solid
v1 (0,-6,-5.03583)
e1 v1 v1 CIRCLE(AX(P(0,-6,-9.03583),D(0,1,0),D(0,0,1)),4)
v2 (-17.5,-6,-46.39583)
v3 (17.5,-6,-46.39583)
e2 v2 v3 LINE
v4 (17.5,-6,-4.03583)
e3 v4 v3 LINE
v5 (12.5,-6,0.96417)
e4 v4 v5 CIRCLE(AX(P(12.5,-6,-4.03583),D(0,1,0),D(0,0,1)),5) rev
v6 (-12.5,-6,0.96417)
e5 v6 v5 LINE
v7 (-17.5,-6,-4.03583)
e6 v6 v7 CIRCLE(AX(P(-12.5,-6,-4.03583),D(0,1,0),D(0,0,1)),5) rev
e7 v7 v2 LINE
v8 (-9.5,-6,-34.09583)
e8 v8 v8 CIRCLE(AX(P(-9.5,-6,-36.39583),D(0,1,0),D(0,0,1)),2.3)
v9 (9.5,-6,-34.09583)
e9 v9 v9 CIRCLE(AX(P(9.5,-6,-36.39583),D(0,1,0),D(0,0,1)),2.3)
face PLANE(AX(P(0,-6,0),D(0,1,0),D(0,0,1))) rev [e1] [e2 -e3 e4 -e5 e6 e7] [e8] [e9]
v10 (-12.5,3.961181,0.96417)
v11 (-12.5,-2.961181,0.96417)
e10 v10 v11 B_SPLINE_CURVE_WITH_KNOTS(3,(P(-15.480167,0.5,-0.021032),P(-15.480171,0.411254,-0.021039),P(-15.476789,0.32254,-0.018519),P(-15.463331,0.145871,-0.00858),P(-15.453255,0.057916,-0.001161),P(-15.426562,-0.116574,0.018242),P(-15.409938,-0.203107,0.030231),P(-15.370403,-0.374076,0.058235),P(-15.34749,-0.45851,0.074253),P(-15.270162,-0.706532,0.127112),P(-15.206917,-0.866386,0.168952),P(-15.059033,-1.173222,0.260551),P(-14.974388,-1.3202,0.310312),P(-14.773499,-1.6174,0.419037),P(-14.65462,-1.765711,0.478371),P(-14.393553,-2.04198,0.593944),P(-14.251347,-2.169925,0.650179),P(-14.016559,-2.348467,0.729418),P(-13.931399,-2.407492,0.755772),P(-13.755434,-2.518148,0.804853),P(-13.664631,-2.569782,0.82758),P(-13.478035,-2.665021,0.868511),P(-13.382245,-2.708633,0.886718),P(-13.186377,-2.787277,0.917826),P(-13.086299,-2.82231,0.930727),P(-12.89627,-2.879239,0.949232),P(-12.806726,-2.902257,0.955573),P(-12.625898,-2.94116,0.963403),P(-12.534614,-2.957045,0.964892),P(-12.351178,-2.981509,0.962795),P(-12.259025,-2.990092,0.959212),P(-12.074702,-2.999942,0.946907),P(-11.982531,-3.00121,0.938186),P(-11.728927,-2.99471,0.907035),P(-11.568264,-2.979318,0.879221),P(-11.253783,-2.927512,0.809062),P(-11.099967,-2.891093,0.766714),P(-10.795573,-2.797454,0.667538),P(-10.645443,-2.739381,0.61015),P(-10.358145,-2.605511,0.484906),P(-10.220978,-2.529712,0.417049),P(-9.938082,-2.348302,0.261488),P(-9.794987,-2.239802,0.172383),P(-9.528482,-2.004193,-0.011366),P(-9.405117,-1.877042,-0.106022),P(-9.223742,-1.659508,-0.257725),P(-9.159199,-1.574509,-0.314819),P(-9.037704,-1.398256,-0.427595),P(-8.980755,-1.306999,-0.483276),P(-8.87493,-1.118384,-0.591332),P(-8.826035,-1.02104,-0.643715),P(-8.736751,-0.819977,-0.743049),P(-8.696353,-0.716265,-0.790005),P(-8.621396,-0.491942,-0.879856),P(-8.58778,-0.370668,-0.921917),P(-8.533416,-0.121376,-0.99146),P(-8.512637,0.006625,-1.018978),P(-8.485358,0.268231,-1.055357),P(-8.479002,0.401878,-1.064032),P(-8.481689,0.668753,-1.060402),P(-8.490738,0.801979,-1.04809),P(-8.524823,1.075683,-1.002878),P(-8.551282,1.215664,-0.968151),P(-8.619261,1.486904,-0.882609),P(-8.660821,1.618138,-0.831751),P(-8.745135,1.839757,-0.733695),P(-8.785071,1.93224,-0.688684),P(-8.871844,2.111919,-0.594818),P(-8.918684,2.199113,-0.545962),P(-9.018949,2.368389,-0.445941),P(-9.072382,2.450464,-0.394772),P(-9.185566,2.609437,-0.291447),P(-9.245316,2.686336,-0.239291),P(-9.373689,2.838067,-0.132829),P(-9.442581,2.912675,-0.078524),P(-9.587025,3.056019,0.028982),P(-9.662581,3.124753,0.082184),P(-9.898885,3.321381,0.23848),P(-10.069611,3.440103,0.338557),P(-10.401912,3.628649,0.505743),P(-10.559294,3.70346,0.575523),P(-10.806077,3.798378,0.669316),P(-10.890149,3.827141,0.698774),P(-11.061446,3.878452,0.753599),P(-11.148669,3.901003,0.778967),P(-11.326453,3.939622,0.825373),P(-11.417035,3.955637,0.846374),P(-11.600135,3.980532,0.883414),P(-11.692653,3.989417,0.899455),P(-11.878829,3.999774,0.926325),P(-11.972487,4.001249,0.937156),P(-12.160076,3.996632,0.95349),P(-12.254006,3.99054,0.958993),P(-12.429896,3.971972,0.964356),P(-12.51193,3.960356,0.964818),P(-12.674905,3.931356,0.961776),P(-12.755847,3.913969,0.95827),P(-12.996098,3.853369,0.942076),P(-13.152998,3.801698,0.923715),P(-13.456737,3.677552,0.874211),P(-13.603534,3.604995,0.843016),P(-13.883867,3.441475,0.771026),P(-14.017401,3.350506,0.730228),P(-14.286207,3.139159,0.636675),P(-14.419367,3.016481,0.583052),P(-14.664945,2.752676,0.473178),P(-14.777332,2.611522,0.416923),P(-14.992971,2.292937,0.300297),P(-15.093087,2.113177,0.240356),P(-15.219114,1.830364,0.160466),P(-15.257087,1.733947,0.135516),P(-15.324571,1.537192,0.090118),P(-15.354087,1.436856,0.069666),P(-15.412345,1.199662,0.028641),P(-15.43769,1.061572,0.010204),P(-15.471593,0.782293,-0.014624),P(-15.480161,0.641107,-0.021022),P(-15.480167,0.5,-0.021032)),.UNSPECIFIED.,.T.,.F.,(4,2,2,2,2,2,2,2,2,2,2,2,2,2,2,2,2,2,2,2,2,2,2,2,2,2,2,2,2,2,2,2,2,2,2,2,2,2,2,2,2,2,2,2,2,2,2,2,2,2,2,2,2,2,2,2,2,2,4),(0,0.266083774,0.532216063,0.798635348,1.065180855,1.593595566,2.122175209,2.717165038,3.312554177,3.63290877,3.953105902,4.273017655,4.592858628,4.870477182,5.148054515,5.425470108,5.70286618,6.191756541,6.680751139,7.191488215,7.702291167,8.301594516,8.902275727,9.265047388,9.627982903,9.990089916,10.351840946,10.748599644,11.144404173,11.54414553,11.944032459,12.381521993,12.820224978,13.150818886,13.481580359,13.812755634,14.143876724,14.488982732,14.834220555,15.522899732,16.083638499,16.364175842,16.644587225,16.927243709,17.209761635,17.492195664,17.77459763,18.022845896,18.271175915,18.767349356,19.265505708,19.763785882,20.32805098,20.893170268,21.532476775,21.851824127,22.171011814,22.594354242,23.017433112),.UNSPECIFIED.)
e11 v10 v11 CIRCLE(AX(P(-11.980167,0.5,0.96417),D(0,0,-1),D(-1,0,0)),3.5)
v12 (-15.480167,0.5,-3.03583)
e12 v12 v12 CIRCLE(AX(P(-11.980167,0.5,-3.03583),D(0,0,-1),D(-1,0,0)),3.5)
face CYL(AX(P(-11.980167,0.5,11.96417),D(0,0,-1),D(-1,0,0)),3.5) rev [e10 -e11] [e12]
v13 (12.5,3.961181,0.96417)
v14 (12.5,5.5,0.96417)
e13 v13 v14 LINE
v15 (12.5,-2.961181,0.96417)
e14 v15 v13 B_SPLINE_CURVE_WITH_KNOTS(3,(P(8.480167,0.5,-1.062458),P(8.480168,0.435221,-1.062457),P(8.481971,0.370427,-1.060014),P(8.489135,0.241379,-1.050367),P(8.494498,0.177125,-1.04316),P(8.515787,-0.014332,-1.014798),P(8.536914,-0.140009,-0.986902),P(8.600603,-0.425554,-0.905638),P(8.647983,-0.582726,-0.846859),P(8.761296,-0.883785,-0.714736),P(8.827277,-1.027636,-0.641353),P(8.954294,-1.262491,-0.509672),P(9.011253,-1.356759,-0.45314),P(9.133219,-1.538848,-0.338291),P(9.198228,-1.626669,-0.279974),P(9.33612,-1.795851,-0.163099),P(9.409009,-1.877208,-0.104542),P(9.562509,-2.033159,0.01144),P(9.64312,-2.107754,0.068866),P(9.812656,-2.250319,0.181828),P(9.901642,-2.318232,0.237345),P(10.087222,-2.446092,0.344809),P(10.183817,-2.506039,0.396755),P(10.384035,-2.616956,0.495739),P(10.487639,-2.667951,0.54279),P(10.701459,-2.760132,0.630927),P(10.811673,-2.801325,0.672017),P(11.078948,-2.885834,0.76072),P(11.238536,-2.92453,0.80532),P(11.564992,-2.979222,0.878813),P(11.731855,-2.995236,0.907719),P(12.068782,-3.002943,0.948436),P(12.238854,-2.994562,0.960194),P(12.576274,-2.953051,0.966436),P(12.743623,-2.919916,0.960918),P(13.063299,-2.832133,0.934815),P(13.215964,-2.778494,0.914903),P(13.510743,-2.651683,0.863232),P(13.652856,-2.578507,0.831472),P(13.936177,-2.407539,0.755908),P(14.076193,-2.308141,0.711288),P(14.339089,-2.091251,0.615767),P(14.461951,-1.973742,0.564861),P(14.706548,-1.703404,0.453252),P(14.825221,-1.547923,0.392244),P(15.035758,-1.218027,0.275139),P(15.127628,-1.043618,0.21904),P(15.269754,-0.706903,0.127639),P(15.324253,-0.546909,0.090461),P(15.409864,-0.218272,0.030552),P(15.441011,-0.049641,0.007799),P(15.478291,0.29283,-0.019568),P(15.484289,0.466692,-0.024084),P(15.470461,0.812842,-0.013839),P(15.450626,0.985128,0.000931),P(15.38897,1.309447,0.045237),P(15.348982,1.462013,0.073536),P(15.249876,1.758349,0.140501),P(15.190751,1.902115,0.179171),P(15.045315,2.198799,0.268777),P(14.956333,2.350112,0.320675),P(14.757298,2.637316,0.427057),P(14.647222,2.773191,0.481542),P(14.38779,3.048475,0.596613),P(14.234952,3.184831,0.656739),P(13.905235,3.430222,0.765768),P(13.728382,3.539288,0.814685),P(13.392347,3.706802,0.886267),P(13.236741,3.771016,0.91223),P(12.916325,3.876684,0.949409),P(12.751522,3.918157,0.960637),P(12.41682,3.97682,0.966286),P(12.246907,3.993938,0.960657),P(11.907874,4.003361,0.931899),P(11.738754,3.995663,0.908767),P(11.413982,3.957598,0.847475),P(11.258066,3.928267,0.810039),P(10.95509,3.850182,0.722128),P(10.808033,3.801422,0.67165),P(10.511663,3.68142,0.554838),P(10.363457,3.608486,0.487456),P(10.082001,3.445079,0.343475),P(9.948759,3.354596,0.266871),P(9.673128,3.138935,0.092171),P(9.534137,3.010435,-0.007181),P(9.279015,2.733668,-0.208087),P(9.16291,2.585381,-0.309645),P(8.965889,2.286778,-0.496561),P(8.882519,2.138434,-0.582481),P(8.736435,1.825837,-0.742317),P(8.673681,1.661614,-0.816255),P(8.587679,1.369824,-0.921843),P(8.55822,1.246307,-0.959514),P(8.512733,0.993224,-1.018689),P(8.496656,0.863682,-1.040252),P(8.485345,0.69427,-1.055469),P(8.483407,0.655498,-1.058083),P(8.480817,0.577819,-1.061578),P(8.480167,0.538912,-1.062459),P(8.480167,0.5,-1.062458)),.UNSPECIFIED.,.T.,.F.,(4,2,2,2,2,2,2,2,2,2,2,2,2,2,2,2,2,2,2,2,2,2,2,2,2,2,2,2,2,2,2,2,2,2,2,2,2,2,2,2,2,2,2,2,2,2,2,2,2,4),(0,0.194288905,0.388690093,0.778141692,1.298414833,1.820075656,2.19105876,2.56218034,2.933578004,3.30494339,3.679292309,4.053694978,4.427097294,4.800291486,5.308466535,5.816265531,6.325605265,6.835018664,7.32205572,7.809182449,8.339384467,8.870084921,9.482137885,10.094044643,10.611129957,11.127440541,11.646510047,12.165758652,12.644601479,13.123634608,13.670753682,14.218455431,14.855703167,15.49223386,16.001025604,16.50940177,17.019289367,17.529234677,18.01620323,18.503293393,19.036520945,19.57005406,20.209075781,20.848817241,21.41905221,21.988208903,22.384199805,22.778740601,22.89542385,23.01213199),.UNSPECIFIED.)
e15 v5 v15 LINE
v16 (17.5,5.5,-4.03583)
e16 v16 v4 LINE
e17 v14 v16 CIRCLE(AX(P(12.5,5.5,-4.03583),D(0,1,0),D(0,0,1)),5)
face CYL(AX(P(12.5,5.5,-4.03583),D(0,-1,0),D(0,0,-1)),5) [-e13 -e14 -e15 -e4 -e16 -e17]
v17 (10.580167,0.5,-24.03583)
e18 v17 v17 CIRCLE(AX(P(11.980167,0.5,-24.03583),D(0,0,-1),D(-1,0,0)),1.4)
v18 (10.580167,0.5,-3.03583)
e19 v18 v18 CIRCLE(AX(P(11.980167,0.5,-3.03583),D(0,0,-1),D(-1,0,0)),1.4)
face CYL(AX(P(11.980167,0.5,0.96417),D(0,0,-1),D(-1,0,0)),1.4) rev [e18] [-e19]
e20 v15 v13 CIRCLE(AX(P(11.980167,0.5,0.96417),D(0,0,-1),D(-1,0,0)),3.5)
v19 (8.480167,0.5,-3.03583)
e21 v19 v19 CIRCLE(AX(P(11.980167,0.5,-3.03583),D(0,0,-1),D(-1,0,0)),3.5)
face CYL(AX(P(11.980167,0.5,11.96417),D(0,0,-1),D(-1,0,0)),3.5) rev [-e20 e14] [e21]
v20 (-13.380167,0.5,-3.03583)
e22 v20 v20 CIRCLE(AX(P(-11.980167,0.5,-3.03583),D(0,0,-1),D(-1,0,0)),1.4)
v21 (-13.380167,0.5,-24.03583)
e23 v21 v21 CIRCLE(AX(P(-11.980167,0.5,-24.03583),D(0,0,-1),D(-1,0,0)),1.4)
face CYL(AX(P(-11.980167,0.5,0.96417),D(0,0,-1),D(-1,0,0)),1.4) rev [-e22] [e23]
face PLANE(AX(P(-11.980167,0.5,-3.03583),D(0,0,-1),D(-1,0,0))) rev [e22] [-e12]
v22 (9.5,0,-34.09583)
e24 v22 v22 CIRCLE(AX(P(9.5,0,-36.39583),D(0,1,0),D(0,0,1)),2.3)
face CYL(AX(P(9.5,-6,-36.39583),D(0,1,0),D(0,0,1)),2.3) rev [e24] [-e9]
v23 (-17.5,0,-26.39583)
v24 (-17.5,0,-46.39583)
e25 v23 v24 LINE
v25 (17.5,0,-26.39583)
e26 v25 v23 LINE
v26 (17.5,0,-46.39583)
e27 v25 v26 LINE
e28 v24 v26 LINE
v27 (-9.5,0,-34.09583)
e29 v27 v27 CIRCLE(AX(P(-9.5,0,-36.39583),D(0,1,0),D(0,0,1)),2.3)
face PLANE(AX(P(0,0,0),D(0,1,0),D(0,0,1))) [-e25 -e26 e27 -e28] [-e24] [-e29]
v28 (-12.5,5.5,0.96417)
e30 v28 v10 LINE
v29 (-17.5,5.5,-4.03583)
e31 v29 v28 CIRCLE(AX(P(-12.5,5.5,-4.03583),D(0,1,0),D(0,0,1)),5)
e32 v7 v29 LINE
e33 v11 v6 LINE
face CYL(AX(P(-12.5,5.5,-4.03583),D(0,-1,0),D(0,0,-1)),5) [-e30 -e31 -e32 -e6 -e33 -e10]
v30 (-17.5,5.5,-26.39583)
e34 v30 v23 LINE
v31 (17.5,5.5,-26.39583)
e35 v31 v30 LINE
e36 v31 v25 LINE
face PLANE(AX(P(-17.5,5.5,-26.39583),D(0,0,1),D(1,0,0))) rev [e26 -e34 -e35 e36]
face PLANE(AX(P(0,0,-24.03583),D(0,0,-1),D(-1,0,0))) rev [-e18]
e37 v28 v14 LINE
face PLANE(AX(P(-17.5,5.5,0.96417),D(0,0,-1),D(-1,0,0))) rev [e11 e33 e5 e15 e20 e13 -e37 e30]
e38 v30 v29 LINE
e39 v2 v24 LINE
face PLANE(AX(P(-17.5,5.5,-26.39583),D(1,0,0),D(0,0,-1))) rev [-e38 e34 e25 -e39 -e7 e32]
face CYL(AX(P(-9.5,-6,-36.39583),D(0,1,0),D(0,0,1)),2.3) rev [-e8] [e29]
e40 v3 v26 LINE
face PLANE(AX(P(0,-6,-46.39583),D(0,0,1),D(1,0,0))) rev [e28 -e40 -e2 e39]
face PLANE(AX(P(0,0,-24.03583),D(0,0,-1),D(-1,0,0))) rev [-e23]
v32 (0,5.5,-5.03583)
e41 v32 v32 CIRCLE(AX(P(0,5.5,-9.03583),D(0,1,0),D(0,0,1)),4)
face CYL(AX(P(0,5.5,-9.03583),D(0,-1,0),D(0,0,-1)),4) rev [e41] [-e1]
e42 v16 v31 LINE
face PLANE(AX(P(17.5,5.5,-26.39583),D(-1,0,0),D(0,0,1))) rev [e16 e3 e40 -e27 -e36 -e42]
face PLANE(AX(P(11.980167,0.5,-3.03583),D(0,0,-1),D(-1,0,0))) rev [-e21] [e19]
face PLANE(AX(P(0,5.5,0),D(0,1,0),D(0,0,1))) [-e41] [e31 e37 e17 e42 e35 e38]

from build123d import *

# Parameters (mm, degrees)
SKETCH1_W                 = 35
SKETCH1_H                 = 27.36
SKETCH1_R                 = 4
BOSS_EXTRUDE1_DEPTH       = 5.5
BOSS_EXTRUDE2_START       = -11.5
BOSS_EXTRUDE2_OUTLINE_W   = 35
BOSS_EXTRUDE2_OUTLINE_H   = 47.36
BOSS_EXTRUDE2_OUTLINE_R   = 4
BOSS_EXTRUDE2_OUTLINE_R_2 = 2.3
BOSS_EXTRUDE2_DEPTH       = 6
FILLET1_R                 = 5
CUT_EXTRUDE1_DEPTH        = 15
CUT_EXTRUDE1_DEPTH_BACK   = 42.689562243
SKETCH4_R                 = 1.4
CUT_EXTRUDE2_START        = -6
SKETCH4_3_R               = 3.5
SKETCH4_3_R_2             = 1.4
CUT_EXTRUDE2_DEPTH        = 15


# Read off the part's stored shape, not the designer's step: Boss-Extrude2
with BuildPart() as part:
    # Sketch1 → Boss-Extrude1 (new body)
    with BuildSketch(Plane(origin=(0, 0, 0), x_dir=(1, 0, 0), z_dir=(0, 1, 0))):
        with Locations((0, 12.715830395)):
            Rectangle(SKETCH1_W, SKETCH1_H)
        with Locations(Location((0, 9.035830395, 0), (0, 0, 270))):
            Circle(SKETCH1_R, mode=Mode.SUBTRACT)
    extrude(amount=BOSS_EXTRUDE1_DEPTH)

    # Boss-Extrude2 outline → Boss-Extrude2 (add)
    with BuildSketch(Plane(origin=(0, 5.5, 0), x_dir=(1, 0, 0), z_dir=(0, 1, 0)).offset(BOSS_EXTRUDE2_START)):
        with Locations((0, 22.715830395)):
            Rectangle(BOSS_EXTRUDE2_OUTLINE_W, BOSS_EXTRUDE2_OUTLINE_H)
        with Locations((0, 9.035830395)):
            Circle(BOSS_EXTRUDE2_OUTLINE_R, mode=Mode.SUBTRACT)
        with Locations((-9.5, 36.395830395)):
            Circle(BOSS_EXTRUDE2_OUTLINE_R_2, mode=Mode.SUBTRACT)
        with Locations((9.5, 36.395830395)):
            Circle(BOSS_EXTRUDE2_OUTLINE_R_2, mode=Mode.SUBTRACT)
    extrude(amount=BOSS_EXTRUDE2_DEPTH)

    # Fillet1
    fillet1_edges = [part.edges().sort_by_distance(p)[0] for p in [
        (17.5, -3, 0.964169605),
        (-17.5, -3, 0.964169605),
    ]]
    fillet(fillet1_edges, radius=FILLET1_R)

    # Sketch4 → Cut-Extrude1 (cut, two sides: drawn at the far end of the back side and taken through both)
    with BuildSketch(Plane(origin=(0, 0, -9.035830395), x_dir=(-1, 0, 0), z_dir=(0, 0, -1)).offset(-CUT_EXTRUDE1_DEPTH_BACK)):
        with Locations((-11.980167066, 0.5)):
            Circle(SKETCH4_R)
        with Locations((11.980167066, 0.5)):
            Circle(SKETCH4_R)
    extrude(amount=CUT_EXTRUDE1_DEPTH + CUT_EXTRUDE1_DEPTH_BACK, mode=Mode.SUBTRACT)

    # Sketch4<3> → Cut-Extrude2 (cut)
    # profile 1 of 2: a face of its own
    with BuildSketch(Plane(origin=(0, 0, -9.035830395), x_dir=(-1, 0, 0), z_dir=(0, 0, -1)).offset(CUT_EXTRUDE2_START)):
        with Locations((-11.980167066, 0.5)):
            Circle(SKETCH4_3_R)
        with Locations((-11.980167066, 0.5)):
            Circle(SKETCH4_3_R_2, mode=Mode.SUBTRACT)
    # profile 2 of 2: a face of its own
    with BuildSketch(Plane(origin=(0, 0, -9.035830395), x_dir=(-1, 0, 0), z_dir=(0, 0, -1)).offset(CUT_EXTRUDE2_START)):
        with Locations((11.980167066, 0.5)):
            Circle(SKETCH4_3_R)
        with Locations((11.980167066, 0.5)):
            Circle(SKETCH4_3_R_2, mode=Mode.SUBTRACT)
    extrude(amount=-CUT_EXTRUDE2_DEPTH, mode=Mode.SUBTRACT)


solid = part.part
